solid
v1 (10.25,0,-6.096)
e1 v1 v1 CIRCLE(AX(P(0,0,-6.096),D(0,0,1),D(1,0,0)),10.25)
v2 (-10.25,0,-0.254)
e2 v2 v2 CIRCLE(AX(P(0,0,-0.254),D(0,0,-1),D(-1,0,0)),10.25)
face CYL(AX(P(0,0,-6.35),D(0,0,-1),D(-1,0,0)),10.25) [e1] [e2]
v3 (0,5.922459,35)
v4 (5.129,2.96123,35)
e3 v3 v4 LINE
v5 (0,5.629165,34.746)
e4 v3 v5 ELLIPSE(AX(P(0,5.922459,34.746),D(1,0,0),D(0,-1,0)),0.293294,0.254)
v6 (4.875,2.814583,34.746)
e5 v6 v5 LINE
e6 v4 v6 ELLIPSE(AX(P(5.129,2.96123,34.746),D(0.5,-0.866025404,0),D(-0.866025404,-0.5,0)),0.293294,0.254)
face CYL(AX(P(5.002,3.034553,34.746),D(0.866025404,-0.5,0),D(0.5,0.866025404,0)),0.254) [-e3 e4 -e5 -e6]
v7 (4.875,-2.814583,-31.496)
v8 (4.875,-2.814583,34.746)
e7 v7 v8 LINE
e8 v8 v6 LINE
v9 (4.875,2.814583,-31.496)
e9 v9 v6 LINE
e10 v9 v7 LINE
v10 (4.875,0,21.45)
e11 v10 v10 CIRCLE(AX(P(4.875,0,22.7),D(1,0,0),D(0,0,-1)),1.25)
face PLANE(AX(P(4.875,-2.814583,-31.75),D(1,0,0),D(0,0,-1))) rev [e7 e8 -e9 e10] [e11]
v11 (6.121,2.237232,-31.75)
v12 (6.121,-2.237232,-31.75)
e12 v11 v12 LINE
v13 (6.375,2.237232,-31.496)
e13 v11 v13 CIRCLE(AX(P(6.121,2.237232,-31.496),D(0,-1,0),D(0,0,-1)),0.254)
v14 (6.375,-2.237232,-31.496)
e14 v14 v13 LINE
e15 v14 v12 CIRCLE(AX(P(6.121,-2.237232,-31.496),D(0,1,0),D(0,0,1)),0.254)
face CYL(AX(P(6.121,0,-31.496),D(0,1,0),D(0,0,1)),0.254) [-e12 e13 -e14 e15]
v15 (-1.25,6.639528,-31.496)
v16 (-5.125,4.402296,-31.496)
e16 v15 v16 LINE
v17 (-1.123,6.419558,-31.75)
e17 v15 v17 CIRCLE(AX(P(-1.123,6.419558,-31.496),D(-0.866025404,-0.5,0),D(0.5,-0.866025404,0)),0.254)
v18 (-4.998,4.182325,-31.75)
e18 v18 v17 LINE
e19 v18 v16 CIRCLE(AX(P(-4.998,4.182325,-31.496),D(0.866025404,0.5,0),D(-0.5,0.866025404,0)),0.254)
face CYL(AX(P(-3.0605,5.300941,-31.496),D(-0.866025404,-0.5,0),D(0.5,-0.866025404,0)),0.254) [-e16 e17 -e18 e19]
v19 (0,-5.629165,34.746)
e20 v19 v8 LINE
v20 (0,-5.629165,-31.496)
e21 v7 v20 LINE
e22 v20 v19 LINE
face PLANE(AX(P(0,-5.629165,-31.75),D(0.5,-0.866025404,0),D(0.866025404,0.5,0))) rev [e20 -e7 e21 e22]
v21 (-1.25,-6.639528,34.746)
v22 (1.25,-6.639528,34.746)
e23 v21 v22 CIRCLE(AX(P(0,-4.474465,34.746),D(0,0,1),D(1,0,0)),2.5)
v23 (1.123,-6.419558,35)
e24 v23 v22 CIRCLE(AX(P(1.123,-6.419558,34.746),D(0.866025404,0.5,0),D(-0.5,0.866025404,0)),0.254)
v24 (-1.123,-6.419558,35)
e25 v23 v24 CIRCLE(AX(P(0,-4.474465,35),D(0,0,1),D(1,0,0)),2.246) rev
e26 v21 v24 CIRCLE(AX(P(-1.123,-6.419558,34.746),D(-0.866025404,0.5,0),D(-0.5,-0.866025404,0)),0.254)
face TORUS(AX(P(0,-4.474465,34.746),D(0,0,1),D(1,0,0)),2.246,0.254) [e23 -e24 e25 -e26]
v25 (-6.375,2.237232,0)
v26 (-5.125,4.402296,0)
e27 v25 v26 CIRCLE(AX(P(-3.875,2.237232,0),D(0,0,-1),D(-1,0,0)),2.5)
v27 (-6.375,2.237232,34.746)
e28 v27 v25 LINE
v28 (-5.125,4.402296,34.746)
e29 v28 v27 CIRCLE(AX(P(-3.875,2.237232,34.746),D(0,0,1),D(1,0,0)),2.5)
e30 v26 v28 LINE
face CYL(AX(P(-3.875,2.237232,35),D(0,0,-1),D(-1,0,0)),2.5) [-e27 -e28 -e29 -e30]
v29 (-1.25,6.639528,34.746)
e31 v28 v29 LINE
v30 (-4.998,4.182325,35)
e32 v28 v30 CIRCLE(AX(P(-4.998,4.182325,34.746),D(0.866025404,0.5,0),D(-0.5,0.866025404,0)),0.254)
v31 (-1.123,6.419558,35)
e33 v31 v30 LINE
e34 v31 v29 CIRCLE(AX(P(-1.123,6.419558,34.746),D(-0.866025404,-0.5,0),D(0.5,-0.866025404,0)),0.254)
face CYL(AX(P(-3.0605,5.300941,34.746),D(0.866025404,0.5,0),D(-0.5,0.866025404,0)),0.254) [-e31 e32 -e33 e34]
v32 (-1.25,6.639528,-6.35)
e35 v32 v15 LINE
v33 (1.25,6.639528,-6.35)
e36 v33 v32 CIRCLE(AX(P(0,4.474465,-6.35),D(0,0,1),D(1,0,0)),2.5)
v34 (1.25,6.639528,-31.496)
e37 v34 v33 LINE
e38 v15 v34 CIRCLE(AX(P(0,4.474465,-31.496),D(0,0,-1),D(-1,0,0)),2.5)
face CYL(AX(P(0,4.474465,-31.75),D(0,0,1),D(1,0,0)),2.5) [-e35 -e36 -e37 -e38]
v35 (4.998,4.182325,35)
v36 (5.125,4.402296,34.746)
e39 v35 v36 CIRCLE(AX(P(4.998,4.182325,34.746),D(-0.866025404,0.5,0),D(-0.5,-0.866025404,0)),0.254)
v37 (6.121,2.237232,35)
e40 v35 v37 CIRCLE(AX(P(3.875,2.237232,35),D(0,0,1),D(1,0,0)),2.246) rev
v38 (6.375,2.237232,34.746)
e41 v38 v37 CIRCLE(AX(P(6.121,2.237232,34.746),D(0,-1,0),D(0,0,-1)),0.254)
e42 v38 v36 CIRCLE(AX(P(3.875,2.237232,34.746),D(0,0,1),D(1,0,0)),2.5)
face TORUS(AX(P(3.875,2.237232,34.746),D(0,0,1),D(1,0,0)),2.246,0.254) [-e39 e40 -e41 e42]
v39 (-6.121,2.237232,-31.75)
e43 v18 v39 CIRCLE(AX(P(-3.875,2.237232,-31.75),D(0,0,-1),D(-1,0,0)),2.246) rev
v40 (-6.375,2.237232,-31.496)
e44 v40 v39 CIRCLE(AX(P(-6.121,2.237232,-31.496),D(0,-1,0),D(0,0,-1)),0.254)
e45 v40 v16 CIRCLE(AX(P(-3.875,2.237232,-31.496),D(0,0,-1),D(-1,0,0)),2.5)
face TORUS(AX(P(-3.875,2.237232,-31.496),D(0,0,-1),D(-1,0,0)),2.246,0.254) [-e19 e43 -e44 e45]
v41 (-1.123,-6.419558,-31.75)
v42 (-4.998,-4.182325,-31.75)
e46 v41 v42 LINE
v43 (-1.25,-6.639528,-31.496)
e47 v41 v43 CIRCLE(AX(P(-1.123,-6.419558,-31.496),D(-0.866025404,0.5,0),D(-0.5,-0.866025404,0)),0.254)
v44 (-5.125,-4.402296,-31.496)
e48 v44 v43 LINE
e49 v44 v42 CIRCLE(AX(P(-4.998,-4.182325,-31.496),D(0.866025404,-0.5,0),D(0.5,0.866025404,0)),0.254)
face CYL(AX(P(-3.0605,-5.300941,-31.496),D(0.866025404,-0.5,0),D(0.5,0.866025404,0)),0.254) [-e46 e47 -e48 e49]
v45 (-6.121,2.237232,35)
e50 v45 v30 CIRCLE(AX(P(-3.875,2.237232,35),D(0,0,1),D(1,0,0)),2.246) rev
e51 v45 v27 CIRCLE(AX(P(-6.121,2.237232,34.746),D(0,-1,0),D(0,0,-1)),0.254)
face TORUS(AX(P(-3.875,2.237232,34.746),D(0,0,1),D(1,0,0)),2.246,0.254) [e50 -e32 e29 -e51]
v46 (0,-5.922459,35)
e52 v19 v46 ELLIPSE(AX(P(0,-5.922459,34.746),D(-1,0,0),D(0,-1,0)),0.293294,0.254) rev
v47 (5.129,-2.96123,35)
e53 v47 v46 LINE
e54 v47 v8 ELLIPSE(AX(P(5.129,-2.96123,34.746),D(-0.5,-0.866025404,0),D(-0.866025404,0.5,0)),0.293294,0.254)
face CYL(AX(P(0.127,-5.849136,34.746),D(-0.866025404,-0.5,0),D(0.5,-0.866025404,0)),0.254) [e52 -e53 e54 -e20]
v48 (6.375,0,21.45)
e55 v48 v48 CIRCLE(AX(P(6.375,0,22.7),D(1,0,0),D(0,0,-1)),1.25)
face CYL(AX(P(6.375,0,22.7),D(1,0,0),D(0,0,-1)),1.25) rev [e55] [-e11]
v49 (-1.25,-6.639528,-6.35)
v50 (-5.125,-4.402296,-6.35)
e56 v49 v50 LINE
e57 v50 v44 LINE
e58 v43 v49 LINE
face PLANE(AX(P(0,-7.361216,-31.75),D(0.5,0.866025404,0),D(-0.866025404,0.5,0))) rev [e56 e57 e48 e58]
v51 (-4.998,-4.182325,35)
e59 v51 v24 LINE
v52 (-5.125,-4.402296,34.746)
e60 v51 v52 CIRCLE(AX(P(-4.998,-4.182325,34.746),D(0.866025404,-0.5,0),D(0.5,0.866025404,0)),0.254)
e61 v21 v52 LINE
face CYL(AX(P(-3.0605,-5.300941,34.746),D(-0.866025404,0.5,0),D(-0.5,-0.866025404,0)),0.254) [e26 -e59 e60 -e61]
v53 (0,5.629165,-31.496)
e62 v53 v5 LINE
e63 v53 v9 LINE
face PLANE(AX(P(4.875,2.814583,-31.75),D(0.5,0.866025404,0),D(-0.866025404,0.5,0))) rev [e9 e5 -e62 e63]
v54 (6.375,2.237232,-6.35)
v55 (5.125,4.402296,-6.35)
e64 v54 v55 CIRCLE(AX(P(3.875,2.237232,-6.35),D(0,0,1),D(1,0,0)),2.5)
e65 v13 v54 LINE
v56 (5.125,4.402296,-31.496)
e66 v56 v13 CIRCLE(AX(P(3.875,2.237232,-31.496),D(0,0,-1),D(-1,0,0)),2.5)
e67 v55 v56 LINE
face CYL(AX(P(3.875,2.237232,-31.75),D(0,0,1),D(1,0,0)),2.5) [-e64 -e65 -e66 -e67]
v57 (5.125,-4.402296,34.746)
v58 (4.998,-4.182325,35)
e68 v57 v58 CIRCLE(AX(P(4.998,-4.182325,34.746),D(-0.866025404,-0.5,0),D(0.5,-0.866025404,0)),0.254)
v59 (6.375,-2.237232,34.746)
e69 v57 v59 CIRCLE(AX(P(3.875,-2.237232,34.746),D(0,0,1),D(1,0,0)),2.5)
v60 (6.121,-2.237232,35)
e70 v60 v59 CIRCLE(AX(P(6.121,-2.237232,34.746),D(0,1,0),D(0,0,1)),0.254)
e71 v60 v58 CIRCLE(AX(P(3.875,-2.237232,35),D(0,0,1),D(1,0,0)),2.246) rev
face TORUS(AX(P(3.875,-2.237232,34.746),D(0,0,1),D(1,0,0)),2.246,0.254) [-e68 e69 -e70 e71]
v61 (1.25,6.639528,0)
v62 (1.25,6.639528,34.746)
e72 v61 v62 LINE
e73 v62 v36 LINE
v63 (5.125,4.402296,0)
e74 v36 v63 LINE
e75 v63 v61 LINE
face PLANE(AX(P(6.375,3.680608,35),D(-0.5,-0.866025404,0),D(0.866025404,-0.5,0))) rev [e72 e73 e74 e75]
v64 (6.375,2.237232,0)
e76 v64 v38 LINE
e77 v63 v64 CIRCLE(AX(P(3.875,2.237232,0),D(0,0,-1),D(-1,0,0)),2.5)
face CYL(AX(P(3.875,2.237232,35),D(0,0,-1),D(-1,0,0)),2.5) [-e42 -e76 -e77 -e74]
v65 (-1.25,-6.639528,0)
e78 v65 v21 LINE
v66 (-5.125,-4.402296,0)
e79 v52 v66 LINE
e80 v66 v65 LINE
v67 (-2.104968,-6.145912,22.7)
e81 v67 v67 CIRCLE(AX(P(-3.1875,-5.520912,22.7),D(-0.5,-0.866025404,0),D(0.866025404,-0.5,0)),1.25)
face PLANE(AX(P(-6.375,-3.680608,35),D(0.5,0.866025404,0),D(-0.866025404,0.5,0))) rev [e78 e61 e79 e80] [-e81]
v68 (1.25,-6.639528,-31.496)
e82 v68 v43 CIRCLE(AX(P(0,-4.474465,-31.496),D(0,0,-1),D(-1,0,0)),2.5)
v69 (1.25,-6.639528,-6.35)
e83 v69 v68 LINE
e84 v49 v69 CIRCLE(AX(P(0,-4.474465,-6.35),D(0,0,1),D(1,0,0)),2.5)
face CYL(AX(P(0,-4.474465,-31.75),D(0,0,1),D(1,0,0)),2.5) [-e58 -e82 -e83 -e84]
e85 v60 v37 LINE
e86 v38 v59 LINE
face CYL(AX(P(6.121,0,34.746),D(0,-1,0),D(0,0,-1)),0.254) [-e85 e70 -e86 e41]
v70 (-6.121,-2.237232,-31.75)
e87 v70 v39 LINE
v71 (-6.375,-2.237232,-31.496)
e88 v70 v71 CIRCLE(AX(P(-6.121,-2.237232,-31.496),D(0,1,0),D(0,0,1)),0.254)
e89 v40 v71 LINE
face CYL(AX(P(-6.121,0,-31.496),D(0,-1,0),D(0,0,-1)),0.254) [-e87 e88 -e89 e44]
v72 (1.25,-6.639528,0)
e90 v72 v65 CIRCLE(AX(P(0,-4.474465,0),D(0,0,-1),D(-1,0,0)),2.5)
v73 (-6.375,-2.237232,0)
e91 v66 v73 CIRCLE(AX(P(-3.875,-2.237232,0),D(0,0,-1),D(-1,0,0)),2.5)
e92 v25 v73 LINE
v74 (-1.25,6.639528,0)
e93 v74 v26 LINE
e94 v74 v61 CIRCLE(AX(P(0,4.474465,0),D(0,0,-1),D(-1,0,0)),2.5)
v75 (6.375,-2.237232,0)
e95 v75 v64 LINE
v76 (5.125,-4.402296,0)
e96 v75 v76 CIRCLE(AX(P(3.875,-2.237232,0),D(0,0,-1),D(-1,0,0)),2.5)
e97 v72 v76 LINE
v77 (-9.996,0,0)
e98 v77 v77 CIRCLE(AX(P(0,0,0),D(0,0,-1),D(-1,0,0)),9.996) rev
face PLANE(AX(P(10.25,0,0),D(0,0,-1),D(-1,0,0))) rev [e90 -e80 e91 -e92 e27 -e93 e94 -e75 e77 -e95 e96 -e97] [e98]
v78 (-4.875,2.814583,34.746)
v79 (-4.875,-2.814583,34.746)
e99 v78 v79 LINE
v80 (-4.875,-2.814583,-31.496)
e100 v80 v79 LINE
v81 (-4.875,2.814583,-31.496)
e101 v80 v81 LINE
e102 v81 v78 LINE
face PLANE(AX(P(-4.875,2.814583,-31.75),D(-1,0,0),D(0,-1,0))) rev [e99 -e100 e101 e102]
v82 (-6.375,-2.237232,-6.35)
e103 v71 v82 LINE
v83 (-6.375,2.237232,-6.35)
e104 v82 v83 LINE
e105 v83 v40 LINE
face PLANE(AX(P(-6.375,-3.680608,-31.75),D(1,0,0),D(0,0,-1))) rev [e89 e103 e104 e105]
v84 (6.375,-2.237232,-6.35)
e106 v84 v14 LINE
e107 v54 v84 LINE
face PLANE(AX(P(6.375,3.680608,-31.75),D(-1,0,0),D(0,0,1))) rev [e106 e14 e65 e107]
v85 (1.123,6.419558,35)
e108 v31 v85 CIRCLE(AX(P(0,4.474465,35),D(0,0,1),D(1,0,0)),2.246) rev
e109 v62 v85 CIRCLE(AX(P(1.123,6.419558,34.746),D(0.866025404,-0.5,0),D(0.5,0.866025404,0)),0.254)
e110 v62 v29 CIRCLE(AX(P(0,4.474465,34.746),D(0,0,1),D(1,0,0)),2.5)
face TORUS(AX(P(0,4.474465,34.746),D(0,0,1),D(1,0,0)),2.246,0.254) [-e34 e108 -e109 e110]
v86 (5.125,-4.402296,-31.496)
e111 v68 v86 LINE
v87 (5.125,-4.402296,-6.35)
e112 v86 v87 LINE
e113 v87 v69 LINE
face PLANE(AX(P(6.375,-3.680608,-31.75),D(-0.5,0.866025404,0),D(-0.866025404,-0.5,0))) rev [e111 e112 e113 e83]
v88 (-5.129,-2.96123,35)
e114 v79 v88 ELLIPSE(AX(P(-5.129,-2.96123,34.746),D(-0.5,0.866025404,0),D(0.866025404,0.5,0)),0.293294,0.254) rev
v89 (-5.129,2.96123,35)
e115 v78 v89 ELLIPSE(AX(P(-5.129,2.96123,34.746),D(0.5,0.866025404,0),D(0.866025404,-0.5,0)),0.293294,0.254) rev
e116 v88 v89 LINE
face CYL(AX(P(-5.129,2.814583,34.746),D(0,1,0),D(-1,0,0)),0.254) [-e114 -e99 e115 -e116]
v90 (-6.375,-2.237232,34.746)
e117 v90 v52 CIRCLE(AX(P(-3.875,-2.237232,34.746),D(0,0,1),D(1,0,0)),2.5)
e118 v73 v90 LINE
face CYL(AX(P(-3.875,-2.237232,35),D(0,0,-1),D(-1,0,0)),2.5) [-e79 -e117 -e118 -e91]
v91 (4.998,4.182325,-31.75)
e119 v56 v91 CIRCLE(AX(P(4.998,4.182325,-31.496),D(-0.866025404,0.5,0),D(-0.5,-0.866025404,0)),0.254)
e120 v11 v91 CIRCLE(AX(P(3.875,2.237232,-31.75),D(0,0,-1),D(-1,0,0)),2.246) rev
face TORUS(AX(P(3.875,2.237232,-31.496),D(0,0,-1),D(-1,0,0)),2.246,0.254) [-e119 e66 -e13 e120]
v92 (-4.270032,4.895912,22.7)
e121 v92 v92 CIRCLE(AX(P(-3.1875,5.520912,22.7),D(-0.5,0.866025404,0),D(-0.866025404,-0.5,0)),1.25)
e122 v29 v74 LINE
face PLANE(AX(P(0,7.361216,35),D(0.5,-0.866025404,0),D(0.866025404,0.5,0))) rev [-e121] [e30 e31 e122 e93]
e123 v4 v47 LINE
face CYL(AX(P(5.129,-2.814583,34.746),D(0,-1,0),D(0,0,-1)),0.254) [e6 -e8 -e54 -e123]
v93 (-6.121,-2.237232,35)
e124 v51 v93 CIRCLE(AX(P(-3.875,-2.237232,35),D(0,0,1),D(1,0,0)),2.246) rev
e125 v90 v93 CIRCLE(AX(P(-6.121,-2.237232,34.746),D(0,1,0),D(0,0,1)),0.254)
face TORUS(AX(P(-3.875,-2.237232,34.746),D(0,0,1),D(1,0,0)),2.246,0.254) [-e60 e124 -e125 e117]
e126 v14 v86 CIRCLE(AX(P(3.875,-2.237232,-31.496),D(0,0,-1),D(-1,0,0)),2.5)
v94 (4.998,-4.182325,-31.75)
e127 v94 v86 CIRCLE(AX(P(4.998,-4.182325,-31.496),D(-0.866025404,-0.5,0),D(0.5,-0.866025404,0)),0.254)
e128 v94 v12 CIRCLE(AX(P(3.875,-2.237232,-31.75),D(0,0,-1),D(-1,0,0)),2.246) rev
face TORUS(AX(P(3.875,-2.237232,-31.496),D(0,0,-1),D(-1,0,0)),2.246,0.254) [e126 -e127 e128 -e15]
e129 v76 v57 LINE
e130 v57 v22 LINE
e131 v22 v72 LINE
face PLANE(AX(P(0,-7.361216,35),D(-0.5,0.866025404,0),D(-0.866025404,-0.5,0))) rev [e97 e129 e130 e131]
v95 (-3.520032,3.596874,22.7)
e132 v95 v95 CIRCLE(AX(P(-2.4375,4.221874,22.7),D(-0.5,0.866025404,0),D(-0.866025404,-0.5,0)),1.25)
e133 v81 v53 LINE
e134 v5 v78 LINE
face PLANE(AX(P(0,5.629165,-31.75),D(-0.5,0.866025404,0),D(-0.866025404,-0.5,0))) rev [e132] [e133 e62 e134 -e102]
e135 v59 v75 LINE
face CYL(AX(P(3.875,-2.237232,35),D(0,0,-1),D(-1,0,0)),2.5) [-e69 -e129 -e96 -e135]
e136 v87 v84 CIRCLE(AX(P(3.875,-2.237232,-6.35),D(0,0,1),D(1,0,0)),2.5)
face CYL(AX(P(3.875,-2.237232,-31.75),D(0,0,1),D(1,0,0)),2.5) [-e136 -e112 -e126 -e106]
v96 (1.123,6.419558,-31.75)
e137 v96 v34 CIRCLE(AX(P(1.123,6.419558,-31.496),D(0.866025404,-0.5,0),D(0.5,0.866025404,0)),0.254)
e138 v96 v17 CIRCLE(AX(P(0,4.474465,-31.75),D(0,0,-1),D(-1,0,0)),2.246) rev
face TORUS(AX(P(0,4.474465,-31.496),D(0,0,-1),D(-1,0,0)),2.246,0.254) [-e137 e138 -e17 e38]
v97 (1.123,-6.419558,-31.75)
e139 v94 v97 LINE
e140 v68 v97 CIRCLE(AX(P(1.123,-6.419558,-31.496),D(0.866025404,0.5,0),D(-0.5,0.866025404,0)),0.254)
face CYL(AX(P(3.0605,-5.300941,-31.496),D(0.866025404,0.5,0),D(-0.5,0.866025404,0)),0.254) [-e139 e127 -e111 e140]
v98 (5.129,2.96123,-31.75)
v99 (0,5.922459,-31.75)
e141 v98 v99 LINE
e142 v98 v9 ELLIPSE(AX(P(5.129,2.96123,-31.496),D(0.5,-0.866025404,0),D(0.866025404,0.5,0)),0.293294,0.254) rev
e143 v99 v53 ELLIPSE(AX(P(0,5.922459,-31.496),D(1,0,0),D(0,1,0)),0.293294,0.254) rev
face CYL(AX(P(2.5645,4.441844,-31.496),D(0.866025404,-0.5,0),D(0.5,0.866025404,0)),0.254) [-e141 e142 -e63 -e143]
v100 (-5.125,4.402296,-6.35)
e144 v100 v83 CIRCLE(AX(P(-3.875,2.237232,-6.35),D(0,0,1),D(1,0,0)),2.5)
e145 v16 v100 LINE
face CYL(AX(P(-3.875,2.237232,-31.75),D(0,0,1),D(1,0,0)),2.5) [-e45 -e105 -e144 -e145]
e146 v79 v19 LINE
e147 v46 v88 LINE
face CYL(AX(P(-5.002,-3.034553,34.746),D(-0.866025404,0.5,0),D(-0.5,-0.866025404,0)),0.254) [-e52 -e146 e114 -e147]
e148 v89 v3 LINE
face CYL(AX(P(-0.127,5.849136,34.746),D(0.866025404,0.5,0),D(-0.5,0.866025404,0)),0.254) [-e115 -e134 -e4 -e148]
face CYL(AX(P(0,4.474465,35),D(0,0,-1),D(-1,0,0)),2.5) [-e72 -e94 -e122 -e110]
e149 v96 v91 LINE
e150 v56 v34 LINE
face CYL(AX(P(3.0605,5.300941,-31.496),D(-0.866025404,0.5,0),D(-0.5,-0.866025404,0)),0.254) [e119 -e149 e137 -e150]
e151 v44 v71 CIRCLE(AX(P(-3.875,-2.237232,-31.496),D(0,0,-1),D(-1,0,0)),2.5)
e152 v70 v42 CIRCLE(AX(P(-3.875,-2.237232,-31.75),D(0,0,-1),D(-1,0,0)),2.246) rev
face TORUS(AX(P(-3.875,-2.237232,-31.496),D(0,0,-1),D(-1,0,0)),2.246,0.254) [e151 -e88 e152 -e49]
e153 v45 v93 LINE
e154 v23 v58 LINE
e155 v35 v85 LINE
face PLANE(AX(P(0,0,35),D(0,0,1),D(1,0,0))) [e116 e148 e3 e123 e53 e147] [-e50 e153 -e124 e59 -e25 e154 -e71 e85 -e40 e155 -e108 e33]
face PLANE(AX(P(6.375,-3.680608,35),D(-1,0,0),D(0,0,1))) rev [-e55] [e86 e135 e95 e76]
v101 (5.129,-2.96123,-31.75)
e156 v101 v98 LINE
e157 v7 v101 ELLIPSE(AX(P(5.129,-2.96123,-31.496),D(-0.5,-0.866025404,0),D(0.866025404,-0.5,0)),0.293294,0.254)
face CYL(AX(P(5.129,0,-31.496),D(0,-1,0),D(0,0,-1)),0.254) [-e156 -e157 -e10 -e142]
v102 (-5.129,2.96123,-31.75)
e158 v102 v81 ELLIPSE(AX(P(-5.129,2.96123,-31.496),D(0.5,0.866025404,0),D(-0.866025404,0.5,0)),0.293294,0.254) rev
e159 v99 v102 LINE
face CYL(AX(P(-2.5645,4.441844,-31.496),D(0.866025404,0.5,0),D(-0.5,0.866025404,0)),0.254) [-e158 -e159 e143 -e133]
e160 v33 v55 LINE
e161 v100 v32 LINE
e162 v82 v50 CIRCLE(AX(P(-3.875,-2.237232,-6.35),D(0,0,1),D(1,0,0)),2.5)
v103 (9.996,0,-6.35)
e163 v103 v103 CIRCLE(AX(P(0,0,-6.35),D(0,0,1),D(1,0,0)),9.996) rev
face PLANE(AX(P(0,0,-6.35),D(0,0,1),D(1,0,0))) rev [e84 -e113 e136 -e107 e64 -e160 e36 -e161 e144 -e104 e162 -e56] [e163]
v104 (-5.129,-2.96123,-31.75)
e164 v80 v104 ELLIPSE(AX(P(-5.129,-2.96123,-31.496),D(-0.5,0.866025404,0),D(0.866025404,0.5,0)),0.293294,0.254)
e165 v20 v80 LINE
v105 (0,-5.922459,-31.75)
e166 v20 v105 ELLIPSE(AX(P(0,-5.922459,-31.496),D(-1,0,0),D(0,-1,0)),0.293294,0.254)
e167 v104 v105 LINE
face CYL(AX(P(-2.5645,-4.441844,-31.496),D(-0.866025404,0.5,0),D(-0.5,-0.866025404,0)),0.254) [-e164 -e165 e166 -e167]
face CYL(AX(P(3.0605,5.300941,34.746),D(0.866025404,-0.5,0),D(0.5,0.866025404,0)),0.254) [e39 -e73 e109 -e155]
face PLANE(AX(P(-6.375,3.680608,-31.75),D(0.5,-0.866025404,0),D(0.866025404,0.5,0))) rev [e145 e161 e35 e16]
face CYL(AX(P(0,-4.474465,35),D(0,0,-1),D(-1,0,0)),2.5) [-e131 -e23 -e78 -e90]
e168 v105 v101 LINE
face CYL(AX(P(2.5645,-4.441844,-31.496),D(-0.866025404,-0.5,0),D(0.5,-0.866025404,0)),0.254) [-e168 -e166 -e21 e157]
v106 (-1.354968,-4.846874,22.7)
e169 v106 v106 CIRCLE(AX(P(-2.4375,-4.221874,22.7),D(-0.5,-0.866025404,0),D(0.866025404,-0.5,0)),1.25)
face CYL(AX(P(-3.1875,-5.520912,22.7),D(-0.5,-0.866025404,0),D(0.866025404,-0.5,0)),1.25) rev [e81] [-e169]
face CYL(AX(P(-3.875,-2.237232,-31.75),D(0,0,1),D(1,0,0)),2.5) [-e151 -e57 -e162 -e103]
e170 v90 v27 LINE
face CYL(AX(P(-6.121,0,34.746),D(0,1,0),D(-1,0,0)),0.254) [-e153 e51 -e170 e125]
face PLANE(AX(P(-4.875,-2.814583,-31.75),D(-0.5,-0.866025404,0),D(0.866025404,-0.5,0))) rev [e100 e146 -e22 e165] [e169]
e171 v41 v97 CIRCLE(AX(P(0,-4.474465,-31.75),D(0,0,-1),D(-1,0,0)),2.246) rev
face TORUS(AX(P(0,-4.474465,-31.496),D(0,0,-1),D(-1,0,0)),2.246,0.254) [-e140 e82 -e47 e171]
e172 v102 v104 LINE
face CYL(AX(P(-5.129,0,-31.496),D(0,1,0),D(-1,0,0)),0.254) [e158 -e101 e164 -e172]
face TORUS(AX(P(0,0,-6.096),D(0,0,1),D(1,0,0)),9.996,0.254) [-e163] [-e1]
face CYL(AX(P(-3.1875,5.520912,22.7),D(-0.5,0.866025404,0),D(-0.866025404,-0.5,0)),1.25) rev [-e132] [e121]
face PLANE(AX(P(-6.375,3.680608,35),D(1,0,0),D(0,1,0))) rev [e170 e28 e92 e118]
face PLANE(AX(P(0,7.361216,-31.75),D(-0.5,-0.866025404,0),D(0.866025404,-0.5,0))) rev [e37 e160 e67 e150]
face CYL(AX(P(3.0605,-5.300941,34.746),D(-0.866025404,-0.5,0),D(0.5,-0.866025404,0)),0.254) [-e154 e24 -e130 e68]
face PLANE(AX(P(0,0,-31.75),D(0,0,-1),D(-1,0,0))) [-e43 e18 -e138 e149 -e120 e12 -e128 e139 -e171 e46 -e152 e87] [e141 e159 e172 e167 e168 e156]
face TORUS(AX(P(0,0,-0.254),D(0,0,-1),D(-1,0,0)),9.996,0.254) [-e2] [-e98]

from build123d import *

# Parameters (mm, degrees)
SKETCH2_W          = 10.25
SKETCH2_H          = 6.35
BOTTOMSHAFT_DEPTH  = 25.4
TOPSHAFT_DEPTH     = 35
CUT_EXTRUDE1_DEPTH = 69.305837964
MOUNTHOLE_REACH    = 60.259
MOUNTHOLE_BORE_R   = 1.25
MOUNTHOLES_COUNT   = 3
FILLET1_R          = 0.254
FILLET2_R          = 2.5


with BuildPart() as part:
    # Sketch2 → Collar (revolve)
    with BuildSketch(Plane(origin=(0, 0, 0), x_dir=(1, 0, 0), z_dir=(0, 1, 0)), mode=Mode.PRIVATE) as collar_sk:
        with Locations((5.125, 3.175)):
            Rectangle(SKETCH2_W, SKETCH2_H)
    revolve(collar_sk.sketch.rotate(Axis((0, 0, -6.35), (0, 0, 1)), 180), axis=Axis((0, 0, -6.35), (0, 0, 1)))

    # Sketch3 → BottomShaft (add)
    with BuildSketch(Plane(origin=(0, 0, -6.35), x_dir=(-1, 0, 0), z_dir=(0, 0, -1))):
        Polygon((-6.375, -3.680607966), (0, -7.361215932), (6.375, -3.680607966), (6.375, 3.680607966), (0, 7.361215932), (-6.375, 3.680607966), align=None)
    extrude(amount=BOTTOMSHAFT_DEPTH)

    # Sketch4 → TopShaft (add)
    with BuildSketch(Plane.XY):
        Polygon((0, -7.361215932), (6.375, -3.680607966), (6.375, 3.680607966), (0, 7.361215932), (-6.375, 3.680607966), (-6.375, -3.680607966), align=None)
    extrude(amount=TOPSHAFT_DEPTH)

    # Sketch5 → Cut-Extrude1 (cut, through all)
    with BuildSketch(Plane.XY.offset(35)):
        Polygon((-4.875, -2.814582562), (0, -5.629165125), (4.875, -2.814582562), (4.875, 2.814582562), (0, 5.629165125), (-4.875, 2.814582562), align=None)
    extrude(amount=-CUT_EXTRUDE1_DEPTH, mode=Mode.SUBTRACT)

    # MountHole bore (on position points) → MountHole (cut, up to next)
    with BuildSketch(Plane(origin=(-3.1875, 5.520911949, 22.7), x_dir=(0.866025403784, 0.5, 0), z_dir=(-0.5, 0.866025403784, 0)), mode=Mode.PRIVATE) as mounthole_sk1:
        Circle(MOUNTHOLE_BORE_R)
    mounthole_tool1 = extrude(mounthole_sk1.sketch, amount=-MOUNTHOLE_REACH, mode=Mode.PRIVATE) & part.part
    mounthole = mounthole_tool1.solids().sort_by_distance((-3.1875, 5.520912, 22.7))[0]
    add(mounthole, mode=Mode.SUBTRACT)

    # MountHoleS: MountHole ×3 about axis
    mountholes_axis = Axis((0, 0, -6.35), (0, 0, -1))
    for i in range(1, MOUNTHOLES_COUNT):
        add(mounthole.rotate(mountholes_axis, i * 360 / MOUNTHOLES_COUNT), mode=Mode.SUBTRACT)

    # Fillet1
    fillet1_edges = [part.edges().sort_by_distance(p)[0] for p in [
        (6.375, 0, -31.75),
        (3.1875, -5.520911949, -31.75),
        (-3.1875, -5.520911949, -31.75),
        (-6.375, 0, -31.75),
        (-3.1875, 5.520911949, -31.75),
        (3.1875, 5.520911949, -31.75),
        (-3.1875, -5.520911949, 35),
        (3.1875, -5.520911949, 35),
        (6.375, 0, 35),
        (3.1875, 5.520911949, 35),
        (-3.1875, 5.520911949, 35),
        (-6.375, 0, 35),
        (10.25, 0, 0),
        (10.25, 0, -6.35),
        (-2.4375, -4.221873843, -31.75),
        (-4.875, 0, -31.75),
        (-2.4375, 4.221873843, -31.75),
        (2.4375, 4.221873843, -31.75),
        (4.875, 0, -31.75),
        (2.4375, -4.221873843, -31.75),
        (-2.4375, -4.221873843, 35),
        (2.4375, -4.221873843, 35),
        (4.875, 0, 35),
        (2.4375, 4.221873843, 35),
        (-2.4375, 4.221873843, 35),
        (-4.875, 0, 35),
    ]]
    fillet(fillet1_edges, radius=FILLET1_R)

    # Fillet2
    # the kernel refuses this fillet: 2.5 mm, written as the material it takes off along each edge
    with BuildSketch(Plane(origin=(-3.875, -2.237232293, -31.75), x_dir=(-0.5000000000000004, -0.8660254037844384, 0), z_dir=(0.8660254037844384, -0.5000000000000004, 0))) as fillet2_piece_1:
        with BuildLine():
            CenterArc((2.246, -0.254), 0.254, 0, 90)
            Line((2.5, -0.254), (2.5, 0))
            Line((2.5, 0), (2.246, 0))
        make_face()
    revolve(axis=Axis((-3.875, -2.237232293, -31.75), (0, 0, -1)), revolution_arc=60, mode=Mode.SUBTRACT)
    with BuildSketch(Plane(origin=(0, -4.474464586, -31.75), x_dir=(0.5000000000000002, -0.8660254037844386, 0), z_dir=(0.8660254037844386, 0.5000000000000002, 0))) as fillet2_piece_2:
        with BuildLine():
            CenterArc((2.246, -0.254), 0.254, 0, 90)
            Line((2.5, -0.254), (2.5, 0))
            Line((2.5, 0), (2.246, 0))
        make_face()
    revolve(axis=Axis((0, -4.474464586, -31.75), (0, 0, -1)), revolution_arc=60, mode=Mode.SUBTRACT)
    with BuildSketch(Plane(origin=(-3.875, 2.237232293, -31.75), x_dir=(-1, 0, 0), z_dir=(0, -1, 0))) as fillet2_piece_3:
        with BuildLine():
            CenterArc((2.246, -0.254), 0.254, 0, 90)
            Line((2.5, -0.254), (2.5, 0))
            Line((2.5, 0), (2.246, 0))
        make_face()
    revolve(axis=Axis((-3.875, 2.237232293, -31.75), (0, 0, -1)), revolution_arc=60, mode=Mode.SUBTRACT)
    with BuildSketch(Plane(origin=(3.875, -2.237232293, -31.75), x_dir=(1, 0, 0), z_dir=(0, 1, 0))) as fillet2_piece_4:
        with BuildLine():
            CenterArc((2.246, -0.254), 0.254, 0, 90)
            Line((2.5, -0.254), (2.5, 0))
            Line((2.5, 0), (2.246, 0))
        make_face()
    revolve(axis=Axis((3.875, -2.237232293, -31.75), (0, 0, -1)), revolution_arc=60, mode=Mode.SUBTRACT)
    with BuildSketch(Plane(origin=(0, 4.474464586, -31.75), x_dir=(-0.5, 0.8660254037844387, 0), z_dir=(-0.8660254037844387, -0.5, 0))) as fillet2_piece_5:
        with BuildLine():
            CenterArc((2.246, -0.254), 0.254, 0, 90)
            Line((2.5, -0.254), (2.5, 0))
            Line((2.5, 0), (2.246, 0))
        make_face()
    revolve(axis=Axis((0, 4.474464586, -31.75), (0, 0, -1)), revolution_arc=60, mode=Mode.SUBTRACT)
    with BuildSketch(Plane(origin=(3.875, 2.237232293, -31.75), x_dir=(0.5000000000000001, 0.8660254037844386, 0), z_dir=(-0.8660254037844386, 0.5000000000000001, 0))) as fillet2_piece_6:
        with BuildLine():
            CenterArc((2.246, -0.254), 0.254, 0, 90)
            Line((2.5, -0.254), (2.5, 0))
            Line((2.5, 0), (2.246, 0))
        make_face()
    revolve(axis=Axis((3.875, 2.237232293, -31.75), (0, 0, -1)), revolution_arc=60, mode=Mode.SUBTRACT)
    with BuildSketch(Plane(origin=(3.875, 2.237232293, 35), x_dir=(1, 0, 0), z_dir=(0, -1, 0))) as fillet2_piece_7:
        with BuildLine():
            CenterArc((2.246, -0.254), 0.254, 0, 90)
            Line((2.5, -0.254), (2.5, 0))
            Line((2.5, 0), (2.246, 0))
        make_face()
    revolve(axis=Axis((3.875, 2.237232293, 35), (0, 0, 1)), revolution_arc=60, mode=Mode.SUBTRACT)
    with BuildSketch(Plane(origin=(3.875, -2.237232293, 35), x_dir=(0.4999999999999999, -0.8660254037844387, 0), z_dir=(-0.8660254037844387, -0.4999999999999999, 0))) as fillet2_piece_8:
        with BuildLine():
            CenterArc((2.246, -0.254), 0.254, 0, 90)
            Line((2.5, -0.254), (2.5, 0))
            Line((2.5, 0), (2.246, 0))
        make_face()
    revolve(axis=Axis((3.875, -2.237232293, 35), (0, 0, 1)), revolution_arc=60, mode=Mode.SUBTRACT)
    with BuildSketch(Plane(origin=(0, 4.474464586, 35), x_dir=(0.49999999999999994, 0.8660254037844389, 0), z_dir=(0.8660254037844389, -0.49999999999999994, 0))) as fillet2_piece_9:
        with BuildLine():
            CenterArc((2.246, -0.254), 0.254, 0, 90)
            Line((2.5, -0.254), (2.5, 0))
            Line((2.5, 0), (2.246, 0))
        make_face()
    revolve(axis=Axis((0, 4.474464586, 35), (0, 0, 1)), revolution_arc=60, mode=Mode.SUBTRACT)
    with BuildSketch(Plane(origin=(0, -4.474464586, 35), x_dir=(-0.5000000000000001, -0.8660254037844387, 0), z_dir=(-0.8660254037844387, 0.5000000000000001, 0))) as fillet2_piece_10:
        with BuildLine():
            CenterArc((2.246, -0.254), 0.254, 0, 90)
            Line((2.5, -0.254), (2.5, 0))
            Line((2.5, 0), (2.246, 0))
        make_face()
    revolve(axis=Axis((0, -4.474464586, 35), (0, 0, 1)), revolution_arc=60, mode=Mode.SUBTRACT)
    with BuildSketch(Plane(origin=(-3.875, 2.237232293, 35), x_dir=(-0.5, 0.8660254037844387, 0), z_dir=(0.8660254037844387, 0.5, 0))) as fillet2_piece_11:
        with BuildLine():
            CenterArc((2.246, -0.254), 0.254, 0, 90)
            Line((2.5, -0.254), (2.5, 0))
            Line((2.5, 0), (2.246, 0))
        make_face()
    revolve(axis=Axis((-3.875, 2.237232293, 35), (0, 0, 1)), revolution_arc=60, mode=Mode.SUBTRACT)
    with BuildSketch(Plane(origin=(-3.875, -2.237232293, 35), x_dir=(-1, 0, 0), z_dir=(0, 1, 0))) as fillet2_piece_12:
        with BuildLine():
            CenterArc((2.246, -0.254), 0.254, 0, 90)
            Line((2.5, -0.254), (2.5, 0))
            Line((2.5, 0), (2.246, 0))
        make_face()
    revolve(axis=Axis((-3.875, -2.237232293, 35), (0, 0, 1)), revolution_arc=60, mode=Mode.SUBTRACT)
    with BuildSketch(Plane(origin=(-6.375, -3.680607966, 0), x_dir=(0, 1, 0), z_dir=(0, 0, 1)), Plane(origin=(-6.375, 3.680607966, 0), x_dir=(0.8660254037844388, 0.49999999999999956, 0), z_dir=(0, 0, 1)), Plane(origin=(0, 7.361215932, 0), x_dir=(0.8660254037844389, -0.4999999999999996, 0), z_dir=(0, 0, 1)), Plane(origin=(6.375, 3.680607966, 0), x_dir=(0, -1, 0), z_dir=(0, 0, 1)), Plane(origin=(6.375, -3.680607966, 0), x_dir=(-0.8660254037844388, -0.49999999999999956, 0), z_dir=(0, 0, 1))) as fillet2_piece_13:
        with BuildLine():
            CenterArc((FILLET2_R * 0.57735026919, -FILLET2_R), FILLET2_R, 90, 60)
            Line((-FILLET2_R * 0.288675134595, -FILLET2_R * 0.5), (0, 0))
            Line((0, 0), (FILLET2_R * 0.57735026919, 0))
        make_face()
    extrude(amount=35, mode=Mode.SUBTRACT)
    with BuildSketch(Plane(origin=(0, -7.361215932, 0), x_dir=(0.8660254037844388, 0.49999999999999983, 0), z_dir=(0, 0, 1))) as fillet2_piece_14:
        with BuildLine():
            CenterArc((FILLET2_R * 0.57735026919, FILLET2_R), FILLET2_R, 210, 60)
            Line((-FILLET2_R * 0.288675134595, FILLET2_R * 0.5), (0, 0))
            Line((0, 0), (FILLET2_R * 0.57735026919, 0))
        make_face()
    extrude(amount=35, mode=Mode.SUBTRACT)
    with BuildSketch(Plane(origin=(6.375, 3.680607966, -6.35), x_dir=(-0.8660254037844386, 0.5000000000000003, 0), z_dir=(0, 0, -1)), Plane(origin=(0, 7.361215932, -6.35), x_dir=(-0.8660254037844387, -0.49999999999999994, 0), z_dir=(0, 0, -1)), Plane(origin=(-6.375, 3.680607966, -6.35), x_dir=(0, -1, 0), z_dir=(0, 0, -1)), Plane(origin=(-6.375, -3.680607966, -6.35), x_dir=(0.8660254037844386, -0.5000000000000003, 0), z_dir=(0, 0, -1)), Plane(origin=(0, -7.361215932, -6.35), x_dir=(0.8660254037844386, 0.5, 0), z_dir=(0, 0, -1))) as fillet2_piece_15:
        with BuildLine():
            CenterArc((FILLET2_R * 0.57735026919, -FILLET2_R), FILLET2_R, 90, 60)
            Line((-FILLET2_R * 0.288675134595, -FILLET2_R * 0.5), (0, 0))
            Line((0, 0), (FILLET2_R * 0.57735026919, 0))
        make_face()
    extrude(amount=25.4, mode=Mode.SUBTRACT)
    with BuildSketch(Plane(origin=(6.375, -3.680607966, -6.35), x_dir=(-0.8660254037844385, -0.5000000000000003, 0), z_dir=(0, 0, -1))) as fillet2_piece_16:
        with BuildLine():
            CenterArc((FILLET2_R * 0.57735026919, FILLET2_R), FILLET2_R, 210, 60)
            Line((-FILLET2_R * 0.288675134595, FILLET2_R * 0.5), (0, 0))
            Line((0, 0), (FILLET2_R * 0.57735026919, 0))
        make_face()
    extrude(amount=25.4, mode=Mode.SUBTRACT)


solid = part.part
